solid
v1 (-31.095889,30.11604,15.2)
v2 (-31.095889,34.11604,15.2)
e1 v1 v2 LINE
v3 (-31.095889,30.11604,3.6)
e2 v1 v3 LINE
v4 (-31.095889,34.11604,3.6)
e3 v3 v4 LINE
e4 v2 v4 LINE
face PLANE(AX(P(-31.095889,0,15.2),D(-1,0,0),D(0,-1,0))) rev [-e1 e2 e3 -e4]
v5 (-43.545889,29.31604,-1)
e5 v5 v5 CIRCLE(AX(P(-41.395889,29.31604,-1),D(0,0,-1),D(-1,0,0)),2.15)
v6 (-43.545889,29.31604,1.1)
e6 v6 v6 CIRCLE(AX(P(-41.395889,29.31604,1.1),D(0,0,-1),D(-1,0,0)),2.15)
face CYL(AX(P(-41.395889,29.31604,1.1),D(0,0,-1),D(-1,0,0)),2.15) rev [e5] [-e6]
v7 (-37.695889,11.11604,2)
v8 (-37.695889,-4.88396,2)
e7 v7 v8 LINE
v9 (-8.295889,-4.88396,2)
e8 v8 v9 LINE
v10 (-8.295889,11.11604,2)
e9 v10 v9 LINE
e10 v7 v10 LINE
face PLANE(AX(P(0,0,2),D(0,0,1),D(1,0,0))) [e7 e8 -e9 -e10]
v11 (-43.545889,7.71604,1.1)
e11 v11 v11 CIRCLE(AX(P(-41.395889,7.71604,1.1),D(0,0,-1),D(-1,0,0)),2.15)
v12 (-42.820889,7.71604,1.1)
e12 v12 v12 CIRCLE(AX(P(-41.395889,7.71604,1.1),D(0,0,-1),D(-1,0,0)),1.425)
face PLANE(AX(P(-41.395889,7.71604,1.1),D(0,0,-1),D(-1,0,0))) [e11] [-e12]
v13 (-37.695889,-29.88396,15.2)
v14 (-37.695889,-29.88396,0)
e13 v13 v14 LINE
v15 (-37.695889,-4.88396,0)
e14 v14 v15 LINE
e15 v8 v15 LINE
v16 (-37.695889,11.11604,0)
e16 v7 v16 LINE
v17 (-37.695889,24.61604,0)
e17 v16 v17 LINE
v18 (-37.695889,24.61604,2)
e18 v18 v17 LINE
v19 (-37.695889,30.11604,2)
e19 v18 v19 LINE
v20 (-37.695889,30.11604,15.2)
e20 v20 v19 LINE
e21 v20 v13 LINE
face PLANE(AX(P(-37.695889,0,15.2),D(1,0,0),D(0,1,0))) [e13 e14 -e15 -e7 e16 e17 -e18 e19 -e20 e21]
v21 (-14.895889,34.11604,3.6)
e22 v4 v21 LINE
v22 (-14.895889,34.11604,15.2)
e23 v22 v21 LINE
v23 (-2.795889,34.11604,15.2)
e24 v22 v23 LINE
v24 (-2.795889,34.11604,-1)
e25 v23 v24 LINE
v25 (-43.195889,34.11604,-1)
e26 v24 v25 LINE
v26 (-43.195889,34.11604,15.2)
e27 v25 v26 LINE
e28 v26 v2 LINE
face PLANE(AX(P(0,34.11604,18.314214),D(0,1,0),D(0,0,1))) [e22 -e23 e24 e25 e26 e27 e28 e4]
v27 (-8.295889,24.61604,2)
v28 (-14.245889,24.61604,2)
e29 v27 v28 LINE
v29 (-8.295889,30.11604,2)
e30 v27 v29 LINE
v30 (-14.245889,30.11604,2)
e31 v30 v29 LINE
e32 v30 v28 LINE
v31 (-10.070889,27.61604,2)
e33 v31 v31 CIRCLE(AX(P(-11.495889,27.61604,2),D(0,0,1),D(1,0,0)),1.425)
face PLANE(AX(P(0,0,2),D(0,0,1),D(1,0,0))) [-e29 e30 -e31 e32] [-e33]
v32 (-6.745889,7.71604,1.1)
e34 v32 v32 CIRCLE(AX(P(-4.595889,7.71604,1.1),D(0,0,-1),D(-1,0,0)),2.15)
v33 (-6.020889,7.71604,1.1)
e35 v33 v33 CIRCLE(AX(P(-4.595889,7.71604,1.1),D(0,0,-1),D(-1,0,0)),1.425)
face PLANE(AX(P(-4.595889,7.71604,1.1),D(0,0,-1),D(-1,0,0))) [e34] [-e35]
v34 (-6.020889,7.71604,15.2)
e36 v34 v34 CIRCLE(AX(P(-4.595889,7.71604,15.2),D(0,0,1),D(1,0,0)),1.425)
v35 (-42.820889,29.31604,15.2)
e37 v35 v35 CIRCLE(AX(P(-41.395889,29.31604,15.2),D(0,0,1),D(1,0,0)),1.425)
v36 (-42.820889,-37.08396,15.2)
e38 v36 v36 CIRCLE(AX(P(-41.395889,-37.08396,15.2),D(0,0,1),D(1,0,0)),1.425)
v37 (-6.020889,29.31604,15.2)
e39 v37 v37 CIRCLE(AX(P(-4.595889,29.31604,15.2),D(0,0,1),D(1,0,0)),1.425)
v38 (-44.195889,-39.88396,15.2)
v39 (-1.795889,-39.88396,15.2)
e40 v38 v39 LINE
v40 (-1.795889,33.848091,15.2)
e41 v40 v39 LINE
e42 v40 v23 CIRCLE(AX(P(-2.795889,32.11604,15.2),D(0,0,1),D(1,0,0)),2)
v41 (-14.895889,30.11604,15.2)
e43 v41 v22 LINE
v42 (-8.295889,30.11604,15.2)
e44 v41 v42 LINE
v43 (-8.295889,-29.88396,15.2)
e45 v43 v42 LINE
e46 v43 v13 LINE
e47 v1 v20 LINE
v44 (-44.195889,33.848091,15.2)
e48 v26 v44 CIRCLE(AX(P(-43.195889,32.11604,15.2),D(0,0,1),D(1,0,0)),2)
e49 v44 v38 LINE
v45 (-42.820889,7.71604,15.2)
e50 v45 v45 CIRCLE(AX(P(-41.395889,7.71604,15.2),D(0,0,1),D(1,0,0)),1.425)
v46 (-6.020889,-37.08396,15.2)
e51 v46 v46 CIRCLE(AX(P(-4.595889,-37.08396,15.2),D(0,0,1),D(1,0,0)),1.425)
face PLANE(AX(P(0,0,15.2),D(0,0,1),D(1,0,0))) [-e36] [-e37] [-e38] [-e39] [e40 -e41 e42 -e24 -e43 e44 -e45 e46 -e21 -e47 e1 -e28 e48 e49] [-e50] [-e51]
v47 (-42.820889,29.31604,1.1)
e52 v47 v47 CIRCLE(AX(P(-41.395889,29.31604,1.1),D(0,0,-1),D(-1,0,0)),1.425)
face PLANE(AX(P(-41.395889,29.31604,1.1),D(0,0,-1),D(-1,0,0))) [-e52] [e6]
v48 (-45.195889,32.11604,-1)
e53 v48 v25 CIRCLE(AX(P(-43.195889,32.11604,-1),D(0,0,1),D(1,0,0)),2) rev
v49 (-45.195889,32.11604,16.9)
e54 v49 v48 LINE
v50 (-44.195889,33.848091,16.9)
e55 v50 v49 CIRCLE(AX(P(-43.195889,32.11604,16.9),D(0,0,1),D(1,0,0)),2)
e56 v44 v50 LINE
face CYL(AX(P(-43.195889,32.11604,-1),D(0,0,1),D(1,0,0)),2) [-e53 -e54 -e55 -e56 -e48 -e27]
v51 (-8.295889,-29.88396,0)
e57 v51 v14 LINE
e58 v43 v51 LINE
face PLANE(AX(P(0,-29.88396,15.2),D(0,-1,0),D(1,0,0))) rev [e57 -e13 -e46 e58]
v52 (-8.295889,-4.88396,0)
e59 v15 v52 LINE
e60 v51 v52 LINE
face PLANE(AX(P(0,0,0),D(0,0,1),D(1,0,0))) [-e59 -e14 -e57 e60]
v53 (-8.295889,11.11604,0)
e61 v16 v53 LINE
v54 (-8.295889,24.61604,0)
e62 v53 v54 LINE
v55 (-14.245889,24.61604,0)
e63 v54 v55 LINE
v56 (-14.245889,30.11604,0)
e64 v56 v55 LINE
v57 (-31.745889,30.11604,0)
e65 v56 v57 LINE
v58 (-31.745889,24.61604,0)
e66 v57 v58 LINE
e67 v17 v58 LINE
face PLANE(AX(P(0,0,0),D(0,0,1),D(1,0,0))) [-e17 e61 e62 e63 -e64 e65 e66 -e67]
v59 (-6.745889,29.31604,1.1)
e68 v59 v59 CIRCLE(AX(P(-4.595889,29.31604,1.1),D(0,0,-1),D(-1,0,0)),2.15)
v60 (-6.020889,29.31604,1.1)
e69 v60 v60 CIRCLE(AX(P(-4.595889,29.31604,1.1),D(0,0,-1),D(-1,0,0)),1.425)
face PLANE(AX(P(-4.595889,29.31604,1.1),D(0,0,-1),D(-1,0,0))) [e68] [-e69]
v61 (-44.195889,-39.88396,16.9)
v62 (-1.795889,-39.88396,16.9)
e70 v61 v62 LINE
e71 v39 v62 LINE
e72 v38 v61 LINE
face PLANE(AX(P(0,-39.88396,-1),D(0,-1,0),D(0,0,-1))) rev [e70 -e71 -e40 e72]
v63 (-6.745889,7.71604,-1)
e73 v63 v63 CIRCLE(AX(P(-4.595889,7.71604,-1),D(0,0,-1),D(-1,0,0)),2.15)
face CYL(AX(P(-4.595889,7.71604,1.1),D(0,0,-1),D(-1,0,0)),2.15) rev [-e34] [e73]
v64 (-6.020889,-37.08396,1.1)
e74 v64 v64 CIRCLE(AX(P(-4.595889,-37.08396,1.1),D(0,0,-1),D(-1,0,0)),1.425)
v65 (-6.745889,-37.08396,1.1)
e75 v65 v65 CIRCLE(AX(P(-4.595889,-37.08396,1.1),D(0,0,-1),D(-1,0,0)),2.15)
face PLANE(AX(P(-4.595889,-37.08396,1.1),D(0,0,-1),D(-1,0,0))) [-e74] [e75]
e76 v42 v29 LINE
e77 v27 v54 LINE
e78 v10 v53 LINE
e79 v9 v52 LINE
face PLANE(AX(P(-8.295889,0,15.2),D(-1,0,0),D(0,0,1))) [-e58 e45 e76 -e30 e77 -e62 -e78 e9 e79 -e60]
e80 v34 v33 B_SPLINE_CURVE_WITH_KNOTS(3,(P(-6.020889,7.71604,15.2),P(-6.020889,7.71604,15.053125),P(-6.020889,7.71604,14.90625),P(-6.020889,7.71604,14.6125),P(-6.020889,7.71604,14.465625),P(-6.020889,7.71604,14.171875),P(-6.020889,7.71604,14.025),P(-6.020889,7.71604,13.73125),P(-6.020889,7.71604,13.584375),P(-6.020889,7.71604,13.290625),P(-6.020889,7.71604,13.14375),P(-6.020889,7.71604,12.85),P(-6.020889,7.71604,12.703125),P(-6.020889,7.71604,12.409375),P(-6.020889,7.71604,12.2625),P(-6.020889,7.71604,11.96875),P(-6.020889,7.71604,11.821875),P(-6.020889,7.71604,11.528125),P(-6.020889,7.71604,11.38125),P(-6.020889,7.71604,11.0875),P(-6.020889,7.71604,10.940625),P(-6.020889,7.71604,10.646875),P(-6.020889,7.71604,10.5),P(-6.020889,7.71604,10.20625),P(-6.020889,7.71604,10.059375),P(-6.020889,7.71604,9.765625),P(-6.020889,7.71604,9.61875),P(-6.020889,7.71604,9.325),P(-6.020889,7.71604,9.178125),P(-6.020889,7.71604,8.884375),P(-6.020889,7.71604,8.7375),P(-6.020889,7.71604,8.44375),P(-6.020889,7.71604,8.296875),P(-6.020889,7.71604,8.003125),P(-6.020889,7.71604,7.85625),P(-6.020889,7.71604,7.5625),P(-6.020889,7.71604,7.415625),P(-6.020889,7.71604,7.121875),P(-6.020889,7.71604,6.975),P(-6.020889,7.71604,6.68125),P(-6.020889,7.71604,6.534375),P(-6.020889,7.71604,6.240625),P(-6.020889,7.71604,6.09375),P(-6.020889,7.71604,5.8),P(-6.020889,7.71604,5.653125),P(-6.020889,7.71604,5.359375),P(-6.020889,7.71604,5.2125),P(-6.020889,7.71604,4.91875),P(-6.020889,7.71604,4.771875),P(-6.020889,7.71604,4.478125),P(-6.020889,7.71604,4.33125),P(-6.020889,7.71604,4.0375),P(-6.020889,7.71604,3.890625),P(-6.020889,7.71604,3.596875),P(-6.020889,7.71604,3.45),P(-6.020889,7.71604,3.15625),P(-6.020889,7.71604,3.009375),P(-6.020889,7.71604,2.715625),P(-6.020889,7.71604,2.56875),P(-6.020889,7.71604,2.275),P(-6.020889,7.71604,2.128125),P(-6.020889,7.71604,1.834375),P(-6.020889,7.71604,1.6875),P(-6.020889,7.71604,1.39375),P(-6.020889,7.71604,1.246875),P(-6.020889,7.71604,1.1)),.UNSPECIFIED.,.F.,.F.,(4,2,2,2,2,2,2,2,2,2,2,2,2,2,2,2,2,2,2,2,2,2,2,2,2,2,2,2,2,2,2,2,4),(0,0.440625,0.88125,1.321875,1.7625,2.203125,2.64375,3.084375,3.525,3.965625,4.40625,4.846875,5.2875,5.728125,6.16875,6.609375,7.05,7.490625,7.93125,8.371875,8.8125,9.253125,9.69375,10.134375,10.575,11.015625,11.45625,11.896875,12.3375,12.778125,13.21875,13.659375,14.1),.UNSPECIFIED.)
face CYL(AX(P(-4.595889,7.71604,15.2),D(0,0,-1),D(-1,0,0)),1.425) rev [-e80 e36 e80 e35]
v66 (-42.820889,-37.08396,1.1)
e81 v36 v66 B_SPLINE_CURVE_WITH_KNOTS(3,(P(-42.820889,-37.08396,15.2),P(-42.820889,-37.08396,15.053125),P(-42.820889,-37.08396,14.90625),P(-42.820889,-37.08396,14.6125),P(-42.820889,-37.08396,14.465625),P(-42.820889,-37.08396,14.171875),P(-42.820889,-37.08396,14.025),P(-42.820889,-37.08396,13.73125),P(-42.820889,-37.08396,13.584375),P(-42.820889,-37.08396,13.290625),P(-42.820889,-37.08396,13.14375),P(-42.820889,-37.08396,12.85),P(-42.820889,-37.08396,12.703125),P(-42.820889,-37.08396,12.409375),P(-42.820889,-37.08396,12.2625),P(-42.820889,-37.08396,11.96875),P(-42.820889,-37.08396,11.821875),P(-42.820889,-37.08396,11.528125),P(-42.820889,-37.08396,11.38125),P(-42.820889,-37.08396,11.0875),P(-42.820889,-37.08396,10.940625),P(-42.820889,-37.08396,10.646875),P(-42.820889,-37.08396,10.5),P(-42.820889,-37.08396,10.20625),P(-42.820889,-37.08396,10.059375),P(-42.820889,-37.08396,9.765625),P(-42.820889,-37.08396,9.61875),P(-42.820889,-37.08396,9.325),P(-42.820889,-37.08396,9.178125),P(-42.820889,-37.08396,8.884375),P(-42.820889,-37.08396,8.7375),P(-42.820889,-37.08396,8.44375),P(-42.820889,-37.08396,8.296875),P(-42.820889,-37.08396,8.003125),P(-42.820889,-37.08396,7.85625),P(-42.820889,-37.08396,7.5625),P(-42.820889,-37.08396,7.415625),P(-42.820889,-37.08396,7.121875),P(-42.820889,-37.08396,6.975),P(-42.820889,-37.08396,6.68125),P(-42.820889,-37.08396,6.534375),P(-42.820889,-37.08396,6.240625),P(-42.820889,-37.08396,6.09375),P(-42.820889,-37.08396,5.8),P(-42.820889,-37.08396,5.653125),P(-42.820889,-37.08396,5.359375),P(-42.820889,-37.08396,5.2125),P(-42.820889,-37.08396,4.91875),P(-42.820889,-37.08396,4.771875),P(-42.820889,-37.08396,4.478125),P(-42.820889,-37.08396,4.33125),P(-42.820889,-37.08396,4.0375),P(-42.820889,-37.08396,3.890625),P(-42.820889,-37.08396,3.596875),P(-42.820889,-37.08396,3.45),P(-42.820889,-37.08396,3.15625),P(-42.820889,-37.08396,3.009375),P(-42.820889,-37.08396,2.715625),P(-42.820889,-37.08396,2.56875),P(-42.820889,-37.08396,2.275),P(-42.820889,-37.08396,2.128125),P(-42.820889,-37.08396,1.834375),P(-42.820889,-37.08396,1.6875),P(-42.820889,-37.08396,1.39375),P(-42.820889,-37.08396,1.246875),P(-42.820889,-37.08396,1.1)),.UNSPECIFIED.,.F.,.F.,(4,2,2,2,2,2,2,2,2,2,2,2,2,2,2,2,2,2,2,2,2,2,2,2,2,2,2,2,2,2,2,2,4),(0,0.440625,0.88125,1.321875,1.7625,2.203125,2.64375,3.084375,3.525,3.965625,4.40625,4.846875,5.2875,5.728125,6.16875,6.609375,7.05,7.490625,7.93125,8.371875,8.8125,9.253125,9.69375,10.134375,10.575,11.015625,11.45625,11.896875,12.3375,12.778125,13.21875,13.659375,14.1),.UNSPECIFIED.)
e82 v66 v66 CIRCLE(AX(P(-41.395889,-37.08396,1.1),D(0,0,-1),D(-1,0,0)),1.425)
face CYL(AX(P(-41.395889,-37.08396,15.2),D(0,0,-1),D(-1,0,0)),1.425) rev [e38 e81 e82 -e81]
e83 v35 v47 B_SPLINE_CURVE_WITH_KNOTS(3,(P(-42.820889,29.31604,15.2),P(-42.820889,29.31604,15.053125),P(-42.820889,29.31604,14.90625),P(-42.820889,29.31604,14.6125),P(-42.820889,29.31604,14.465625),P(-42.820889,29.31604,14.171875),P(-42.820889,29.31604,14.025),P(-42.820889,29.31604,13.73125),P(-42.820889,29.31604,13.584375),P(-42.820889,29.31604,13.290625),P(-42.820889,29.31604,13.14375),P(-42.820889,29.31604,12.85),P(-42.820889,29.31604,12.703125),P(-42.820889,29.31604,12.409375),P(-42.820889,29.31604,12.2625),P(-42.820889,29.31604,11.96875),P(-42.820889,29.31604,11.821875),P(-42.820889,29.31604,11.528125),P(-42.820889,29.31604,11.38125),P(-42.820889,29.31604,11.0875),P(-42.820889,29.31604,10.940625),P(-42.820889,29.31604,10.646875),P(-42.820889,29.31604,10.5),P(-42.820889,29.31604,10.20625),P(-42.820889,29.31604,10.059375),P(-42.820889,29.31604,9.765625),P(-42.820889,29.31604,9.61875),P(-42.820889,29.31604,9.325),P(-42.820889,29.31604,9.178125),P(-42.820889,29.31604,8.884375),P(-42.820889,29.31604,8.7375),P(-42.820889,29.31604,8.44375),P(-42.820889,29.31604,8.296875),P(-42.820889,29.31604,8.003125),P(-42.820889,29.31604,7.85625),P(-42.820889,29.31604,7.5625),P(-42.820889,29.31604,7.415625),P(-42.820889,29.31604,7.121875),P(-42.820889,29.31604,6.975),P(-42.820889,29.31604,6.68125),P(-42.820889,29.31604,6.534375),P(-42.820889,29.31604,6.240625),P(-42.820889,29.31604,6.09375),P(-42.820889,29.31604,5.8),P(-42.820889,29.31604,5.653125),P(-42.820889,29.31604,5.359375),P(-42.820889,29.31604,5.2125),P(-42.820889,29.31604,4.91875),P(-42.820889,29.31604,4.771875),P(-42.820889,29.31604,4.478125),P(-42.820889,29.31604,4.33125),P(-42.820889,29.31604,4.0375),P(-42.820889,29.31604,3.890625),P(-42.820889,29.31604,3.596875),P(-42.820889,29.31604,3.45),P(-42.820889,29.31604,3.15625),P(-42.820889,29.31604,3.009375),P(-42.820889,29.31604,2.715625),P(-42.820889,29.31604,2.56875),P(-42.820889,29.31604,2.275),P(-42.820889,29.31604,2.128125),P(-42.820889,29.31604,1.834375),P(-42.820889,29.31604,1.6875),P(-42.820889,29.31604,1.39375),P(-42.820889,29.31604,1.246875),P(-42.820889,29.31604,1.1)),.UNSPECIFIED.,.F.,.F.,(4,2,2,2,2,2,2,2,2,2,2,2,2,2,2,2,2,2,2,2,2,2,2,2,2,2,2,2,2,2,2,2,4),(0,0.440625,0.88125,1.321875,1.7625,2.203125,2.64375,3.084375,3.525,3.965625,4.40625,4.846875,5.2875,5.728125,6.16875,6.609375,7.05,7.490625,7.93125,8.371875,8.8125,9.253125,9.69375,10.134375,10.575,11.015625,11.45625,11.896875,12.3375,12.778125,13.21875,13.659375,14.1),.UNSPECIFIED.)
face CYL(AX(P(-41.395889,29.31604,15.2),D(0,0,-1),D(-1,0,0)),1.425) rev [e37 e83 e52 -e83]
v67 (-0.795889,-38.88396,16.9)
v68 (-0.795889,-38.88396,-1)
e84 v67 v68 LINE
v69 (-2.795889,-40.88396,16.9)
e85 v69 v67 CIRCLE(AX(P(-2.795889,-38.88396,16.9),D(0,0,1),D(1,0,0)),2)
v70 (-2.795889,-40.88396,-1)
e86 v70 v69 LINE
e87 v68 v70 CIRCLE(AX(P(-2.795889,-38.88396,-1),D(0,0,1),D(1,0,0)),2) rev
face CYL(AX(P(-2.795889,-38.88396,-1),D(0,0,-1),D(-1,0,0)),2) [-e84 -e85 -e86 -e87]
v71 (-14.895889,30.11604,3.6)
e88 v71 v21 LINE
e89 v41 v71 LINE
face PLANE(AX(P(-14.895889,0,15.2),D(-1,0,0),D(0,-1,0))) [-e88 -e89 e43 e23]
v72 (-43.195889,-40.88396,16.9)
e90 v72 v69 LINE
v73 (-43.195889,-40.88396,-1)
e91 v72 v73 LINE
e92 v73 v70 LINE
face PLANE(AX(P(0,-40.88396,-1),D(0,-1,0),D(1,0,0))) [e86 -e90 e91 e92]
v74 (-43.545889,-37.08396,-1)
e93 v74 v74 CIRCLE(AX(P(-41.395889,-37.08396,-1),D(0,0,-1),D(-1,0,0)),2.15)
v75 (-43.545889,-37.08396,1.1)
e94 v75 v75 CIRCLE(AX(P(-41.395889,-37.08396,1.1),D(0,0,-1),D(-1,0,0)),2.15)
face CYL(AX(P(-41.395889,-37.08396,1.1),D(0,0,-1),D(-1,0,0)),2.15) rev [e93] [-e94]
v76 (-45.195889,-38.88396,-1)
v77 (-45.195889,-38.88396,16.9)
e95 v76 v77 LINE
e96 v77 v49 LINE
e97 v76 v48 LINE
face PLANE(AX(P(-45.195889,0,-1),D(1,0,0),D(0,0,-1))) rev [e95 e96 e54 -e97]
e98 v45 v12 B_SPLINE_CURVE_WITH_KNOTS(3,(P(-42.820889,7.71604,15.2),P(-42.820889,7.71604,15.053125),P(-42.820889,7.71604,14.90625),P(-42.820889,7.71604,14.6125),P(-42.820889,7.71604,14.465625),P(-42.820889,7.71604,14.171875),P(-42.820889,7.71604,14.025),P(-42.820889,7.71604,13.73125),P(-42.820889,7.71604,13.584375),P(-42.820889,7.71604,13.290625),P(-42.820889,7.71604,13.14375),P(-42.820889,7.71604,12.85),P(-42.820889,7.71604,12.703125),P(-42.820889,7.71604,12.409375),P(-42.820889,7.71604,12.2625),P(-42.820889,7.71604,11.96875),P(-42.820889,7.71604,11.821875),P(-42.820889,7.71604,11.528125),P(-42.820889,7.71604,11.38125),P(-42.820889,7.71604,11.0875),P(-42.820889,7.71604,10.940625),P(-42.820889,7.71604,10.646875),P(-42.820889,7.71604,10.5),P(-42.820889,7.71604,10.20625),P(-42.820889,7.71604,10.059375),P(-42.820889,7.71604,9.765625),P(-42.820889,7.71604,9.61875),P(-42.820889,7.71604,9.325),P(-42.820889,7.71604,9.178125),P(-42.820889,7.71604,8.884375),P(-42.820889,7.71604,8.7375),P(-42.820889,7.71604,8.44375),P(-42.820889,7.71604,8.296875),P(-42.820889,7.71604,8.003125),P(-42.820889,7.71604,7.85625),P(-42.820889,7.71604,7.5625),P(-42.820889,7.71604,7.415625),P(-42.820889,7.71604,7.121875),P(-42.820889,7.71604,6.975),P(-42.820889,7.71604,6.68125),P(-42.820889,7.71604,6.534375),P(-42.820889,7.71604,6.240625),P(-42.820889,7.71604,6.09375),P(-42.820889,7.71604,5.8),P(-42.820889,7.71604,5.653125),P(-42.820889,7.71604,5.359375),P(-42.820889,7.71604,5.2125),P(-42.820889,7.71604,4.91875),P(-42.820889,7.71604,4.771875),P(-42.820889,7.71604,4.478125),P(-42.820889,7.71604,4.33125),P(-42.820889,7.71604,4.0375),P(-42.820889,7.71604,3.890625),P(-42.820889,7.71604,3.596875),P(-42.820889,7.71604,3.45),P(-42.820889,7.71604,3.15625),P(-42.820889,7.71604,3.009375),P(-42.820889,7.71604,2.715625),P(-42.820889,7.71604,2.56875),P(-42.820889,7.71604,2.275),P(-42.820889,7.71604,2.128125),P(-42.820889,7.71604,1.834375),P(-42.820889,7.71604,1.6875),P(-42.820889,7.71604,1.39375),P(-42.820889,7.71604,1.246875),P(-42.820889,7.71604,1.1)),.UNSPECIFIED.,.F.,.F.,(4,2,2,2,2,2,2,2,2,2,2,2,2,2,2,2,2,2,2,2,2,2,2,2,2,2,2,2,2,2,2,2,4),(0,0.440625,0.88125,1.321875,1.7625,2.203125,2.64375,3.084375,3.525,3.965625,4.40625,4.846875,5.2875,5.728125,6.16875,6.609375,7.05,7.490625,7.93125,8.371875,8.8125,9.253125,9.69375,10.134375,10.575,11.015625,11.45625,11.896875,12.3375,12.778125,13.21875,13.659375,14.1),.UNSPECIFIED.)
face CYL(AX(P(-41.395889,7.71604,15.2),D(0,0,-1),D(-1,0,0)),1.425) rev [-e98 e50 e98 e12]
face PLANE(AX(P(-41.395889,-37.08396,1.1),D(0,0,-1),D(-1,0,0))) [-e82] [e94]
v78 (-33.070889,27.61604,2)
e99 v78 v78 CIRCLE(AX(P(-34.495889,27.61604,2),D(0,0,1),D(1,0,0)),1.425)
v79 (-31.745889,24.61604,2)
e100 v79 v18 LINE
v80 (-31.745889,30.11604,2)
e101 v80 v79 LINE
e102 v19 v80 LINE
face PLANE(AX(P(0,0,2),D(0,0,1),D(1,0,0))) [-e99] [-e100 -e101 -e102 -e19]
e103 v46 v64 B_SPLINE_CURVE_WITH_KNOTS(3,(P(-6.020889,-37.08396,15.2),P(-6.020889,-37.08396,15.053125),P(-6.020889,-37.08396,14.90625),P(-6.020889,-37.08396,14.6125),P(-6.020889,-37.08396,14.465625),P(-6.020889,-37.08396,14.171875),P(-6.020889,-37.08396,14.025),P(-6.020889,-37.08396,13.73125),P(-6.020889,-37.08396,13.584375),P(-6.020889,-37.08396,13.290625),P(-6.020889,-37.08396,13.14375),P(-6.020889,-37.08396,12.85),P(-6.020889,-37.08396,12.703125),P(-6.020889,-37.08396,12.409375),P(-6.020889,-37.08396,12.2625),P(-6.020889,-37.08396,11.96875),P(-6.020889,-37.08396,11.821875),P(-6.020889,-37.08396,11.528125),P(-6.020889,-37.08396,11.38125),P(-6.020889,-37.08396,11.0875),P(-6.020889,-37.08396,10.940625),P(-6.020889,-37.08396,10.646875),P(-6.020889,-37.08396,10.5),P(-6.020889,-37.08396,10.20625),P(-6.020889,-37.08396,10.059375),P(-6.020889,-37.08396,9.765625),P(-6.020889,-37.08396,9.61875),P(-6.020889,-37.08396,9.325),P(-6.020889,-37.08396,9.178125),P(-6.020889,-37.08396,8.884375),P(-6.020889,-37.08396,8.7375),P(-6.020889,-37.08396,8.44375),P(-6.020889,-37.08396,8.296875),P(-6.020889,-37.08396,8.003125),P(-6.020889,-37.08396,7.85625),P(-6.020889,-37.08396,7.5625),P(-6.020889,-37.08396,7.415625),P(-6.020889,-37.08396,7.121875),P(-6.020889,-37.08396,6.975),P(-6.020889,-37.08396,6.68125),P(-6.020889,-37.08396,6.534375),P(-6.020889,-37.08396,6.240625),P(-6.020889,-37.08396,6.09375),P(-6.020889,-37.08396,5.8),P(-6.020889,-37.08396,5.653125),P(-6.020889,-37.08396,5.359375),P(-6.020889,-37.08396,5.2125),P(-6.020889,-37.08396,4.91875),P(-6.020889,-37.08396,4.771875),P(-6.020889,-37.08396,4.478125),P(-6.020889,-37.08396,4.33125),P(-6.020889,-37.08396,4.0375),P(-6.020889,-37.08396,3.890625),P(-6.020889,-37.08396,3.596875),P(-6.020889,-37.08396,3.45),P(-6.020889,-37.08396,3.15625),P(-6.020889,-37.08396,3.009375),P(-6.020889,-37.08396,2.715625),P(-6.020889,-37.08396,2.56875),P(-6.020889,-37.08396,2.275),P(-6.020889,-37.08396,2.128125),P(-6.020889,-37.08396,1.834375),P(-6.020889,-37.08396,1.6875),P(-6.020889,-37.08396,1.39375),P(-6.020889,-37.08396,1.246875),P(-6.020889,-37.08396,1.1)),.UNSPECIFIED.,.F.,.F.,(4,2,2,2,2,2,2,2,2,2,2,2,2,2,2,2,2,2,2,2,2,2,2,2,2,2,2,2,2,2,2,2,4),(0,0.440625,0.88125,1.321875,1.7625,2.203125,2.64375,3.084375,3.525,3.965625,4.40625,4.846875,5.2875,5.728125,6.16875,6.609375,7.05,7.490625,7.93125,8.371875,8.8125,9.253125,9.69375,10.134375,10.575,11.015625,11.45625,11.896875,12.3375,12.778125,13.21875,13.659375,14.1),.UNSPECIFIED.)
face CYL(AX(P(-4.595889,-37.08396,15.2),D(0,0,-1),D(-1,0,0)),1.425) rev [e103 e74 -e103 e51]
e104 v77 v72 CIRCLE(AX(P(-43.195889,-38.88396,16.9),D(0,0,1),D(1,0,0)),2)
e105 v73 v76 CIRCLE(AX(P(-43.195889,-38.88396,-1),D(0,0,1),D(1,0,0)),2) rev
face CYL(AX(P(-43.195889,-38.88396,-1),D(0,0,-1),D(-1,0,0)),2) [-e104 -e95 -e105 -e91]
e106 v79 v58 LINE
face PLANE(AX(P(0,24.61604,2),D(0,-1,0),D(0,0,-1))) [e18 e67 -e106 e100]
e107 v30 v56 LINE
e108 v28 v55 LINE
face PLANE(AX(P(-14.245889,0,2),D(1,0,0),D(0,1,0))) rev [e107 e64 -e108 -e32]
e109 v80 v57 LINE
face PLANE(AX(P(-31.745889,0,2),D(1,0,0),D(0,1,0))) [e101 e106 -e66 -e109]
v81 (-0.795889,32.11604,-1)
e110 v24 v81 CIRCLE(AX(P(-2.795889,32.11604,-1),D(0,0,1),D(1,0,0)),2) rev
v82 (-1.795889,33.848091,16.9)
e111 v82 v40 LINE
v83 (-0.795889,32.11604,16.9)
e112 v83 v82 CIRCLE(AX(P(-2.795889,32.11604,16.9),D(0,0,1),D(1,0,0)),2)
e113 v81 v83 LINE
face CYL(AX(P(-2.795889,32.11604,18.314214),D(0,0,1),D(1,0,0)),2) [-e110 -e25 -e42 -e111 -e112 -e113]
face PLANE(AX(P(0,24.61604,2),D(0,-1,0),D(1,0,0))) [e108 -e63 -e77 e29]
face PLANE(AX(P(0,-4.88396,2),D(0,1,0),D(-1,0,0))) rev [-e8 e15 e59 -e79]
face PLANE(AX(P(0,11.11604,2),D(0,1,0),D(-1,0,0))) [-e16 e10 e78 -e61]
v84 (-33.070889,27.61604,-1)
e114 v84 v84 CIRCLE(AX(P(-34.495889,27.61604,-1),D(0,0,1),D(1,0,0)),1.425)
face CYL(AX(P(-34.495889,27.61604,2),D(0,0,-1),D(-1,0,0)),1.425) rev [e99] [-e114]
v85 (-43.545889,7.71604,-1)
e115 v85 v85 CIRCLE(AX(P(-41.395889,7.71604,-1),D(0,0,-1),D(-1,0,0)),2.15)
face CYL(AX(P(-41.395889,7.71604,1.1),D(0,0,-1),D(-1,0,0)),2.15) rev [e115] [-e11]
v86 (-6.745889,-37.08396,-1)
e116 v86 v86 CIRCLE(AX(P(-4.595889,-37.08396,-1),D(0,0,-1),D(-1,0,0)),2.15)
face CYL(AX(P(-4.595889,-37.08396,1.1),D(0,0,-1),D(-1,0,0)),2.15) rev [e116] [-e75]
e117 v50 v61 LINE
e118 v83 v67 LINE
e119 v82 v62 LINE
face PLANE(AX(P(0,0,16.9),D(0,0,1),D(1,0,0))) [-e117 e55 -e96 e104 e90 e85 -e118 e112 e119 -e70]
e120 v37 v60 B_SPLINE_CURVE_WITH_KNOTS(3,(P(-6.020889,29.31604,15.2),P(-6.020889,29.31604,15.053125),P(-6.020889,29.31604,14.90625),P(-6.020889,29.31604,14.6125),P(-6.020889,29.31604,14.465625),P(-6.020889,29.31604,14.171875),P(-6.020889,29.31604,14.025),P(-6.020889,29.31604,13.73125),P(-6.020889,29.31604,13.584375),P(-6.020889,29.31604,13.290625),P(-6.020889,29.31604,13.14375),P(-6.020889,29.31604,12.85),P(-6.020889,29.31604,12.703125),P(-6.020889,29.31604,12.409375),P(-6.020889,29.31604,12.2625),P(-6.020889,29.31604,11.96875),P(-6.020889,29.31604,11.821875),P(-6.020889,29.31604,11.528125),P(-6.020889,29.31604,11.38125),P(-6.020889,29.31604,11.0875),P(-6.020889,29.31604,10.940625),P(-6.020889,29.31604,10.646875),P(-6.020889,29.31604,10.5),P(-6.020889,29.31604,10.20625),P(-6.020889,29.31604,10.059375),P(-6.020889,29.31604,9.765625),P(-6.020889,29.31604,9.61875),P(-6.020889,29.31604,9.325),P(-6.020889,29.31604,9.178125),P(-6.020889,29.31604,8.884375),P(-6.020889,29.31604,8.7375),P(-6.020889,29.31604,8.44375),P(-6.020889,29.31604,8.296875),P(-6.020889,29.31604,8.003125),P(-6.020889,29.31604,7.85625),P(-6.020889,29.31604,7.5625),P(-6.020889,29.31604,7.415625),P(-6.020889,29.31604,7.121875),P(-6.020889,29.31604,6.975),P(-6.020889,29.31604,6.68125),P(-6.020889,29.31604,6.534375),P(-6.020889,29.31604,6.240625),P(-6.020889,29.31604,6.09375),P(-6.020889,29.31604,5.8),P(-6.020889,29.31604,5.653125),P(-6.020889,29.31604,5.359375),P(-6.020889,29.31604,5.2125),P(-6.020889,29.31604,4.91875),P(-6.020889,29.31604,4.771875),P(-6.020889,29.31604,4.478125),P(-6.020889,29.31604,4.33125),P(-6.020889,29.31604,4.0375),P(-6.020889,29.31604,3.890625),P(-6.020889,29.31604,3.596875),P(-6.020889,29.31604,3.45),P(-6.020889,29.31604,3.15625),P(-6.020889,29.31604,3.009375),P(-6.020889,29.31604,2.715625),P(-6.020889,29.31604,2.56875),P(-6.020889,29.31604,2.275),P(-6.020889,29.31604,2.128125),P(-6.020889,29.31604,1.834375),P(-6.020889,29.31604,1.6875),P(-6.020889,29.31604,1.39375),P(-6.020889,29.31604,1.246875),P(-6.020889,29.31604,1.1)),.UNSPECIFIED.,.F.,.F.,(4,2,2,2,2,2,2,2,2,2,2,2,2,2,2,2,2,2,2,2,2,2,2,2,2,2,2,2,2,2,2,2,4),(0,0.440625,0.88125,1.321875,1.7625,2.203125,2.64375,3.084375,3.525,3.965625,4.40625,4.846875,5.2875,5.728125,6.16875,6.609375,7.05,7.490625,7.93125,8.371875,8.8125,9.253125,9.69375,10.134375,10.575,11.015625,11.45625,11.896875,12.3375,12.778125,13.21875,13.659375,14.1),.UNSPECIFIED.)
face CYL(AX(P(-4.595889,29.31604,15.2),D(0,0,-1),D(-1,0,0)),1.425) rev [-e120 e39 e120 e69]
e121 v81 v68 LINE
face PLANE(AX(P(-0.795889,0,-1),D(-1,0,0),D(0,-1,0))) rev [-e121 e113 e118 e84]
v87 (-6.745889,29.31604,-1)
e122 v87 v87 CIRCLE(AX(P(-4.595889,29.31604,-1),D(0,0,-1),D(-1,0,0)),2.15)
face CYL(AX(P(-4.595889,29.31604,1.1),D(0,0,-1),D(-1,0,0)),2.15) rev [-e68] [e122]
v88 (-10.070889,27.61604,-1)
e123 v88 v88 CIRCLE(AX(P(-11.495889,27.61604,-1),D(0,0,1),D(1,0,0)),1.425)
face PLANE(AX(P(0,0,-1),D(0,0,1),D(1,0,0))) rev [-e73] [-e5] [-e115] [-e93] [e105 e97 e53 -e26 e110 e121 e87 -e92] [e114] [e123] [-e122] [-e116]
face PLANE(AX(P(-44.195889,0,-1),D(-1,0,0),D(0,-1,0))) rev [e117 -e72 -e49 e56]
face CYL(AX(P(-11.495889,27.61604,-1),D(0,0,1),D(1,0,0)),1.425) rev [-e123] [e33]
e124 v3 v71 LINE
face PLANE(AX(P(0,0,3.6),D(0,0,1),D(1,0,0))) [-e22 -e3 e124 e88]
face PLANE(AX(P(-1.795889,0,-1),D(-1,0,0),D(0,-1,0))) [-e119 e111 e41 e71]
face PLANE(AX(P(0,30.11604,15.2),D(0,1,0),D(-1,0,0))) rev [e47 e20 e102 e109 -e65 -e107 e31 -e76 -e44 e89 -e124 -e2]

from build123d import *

# Parameters (mm, degrees)
SKETCH_2_R            = 1.425
EXTRUDE_1_DEPTH       = 2
SKETCH_2_3_R          = 1.425
EXTRUDE_2_DEPTH       = 2
EXTRUDE_START         = -1
EXTRUDE_3_DEPTH       = 1
EXTRUDE_4_DEPTH       = 1
SKETCH_2_6_W          = 8.1
SKETCH_2_6_H          = 3
EXTRUDE_5_DEPTH       = 3.6
EXTRUDE_6_DEPTH       = 15.2
EXTRUDE_6_DEPTH_BACK  = 1
SKETCH_2_7_R          = 1.425
SKETCH_2_8_W          = 29.4
SKETCH_2_8_H          = 25
EXTRUDE_7_DEPTH       = 1
SKETCH_2_9_W          = 29.4
SKETCH_2_9_H          = 16
EXTRUDE_8_DEPTH       = 1
SKETCH_2_10_W         = 29.4
SKETCH_2_10_H         = 16
EXTRUDE_9_DEPTH       = 2
SKETCH_2_11_W         = 8.1
SKETCH_2_11_H         = 3
SKETCH_2_11_R         = 1.425
EXTRUDE_10_DEPTH      = 1
EXTRUDE_12_DEPTH      = 16.9
EXTRUDE_12_DEPTH_BACK = 1
SKETCH_2_24_W         = 1
SKETCH_2_24_H         = 1
EXTRUDE_13_DEPTH      = 16.9
SKETCH_2_25_W         = 13.1
SKETCH_2_25_H         = 1
EXTRUDE_14_DEPTH      = 15.2
SKETCH_2_26_W         = 8.1
SKETCH_2_26_H         = 1
EXTRUDE_15_DEPTH      = 3.6
SKETCH_2_28_W         = 1
SKETCH_2_28_H         = 1
SKETCH_2_28_W_2       = 13.1
SKETCH_2_28_W_3       = 8.1
EXTRUDE_16_DEPTH      = 1
FILLET_1_R            = 2
SKETCH_4_R            = 2.15
SKETCH_4_R_2          = 1.425
CUT_EXTRUDE_1_DEPTH   = 2.1


# Read off the part's stored shape, not the designer's step: 凸台-拉伸3
with BuildPart() as part:
    # 草图2 → 凸台-拉伸1 (new body)
    with BuildSketch(Plane.XY):
        Polygon((-31.74588875, 30.116039863), (-37.24588875, 30.116039863), (-37.69588875, 30.116039863), (-37.69588875, 24.616039863), (-37.24588875, 24.616039863), (-31.74588875, 24.616039863), align=None)
        with Locations((-34.49588875, 27.616039863)):
            Circle(SKETCH_2_R, mode=Mode.SUBTRACT)
    extrude(amount=EXTRUDE_1_DEPTH)



with BuildPart() as body_2:
    # 草图2<3> → 凸台-拉伸2 (new body)
    with BuildSketch(Plane.XY):
        Polygon((-8.74588875, 30.116039863), (-14.24588875, 30.116039863), (-14.24588875, 24.616039863), (-8.74588875, 24.616039863), (-8.29588875, 24.616039863), (-8.29588875, 30.116039863), align=None)
        with Locations((-11.49588875, 27.616039863)):
            Circle(SKETCH_2_3_R, mode=Mode.SUBTRACT)
    extrude(amount=EXTRUDE_2_DEPTH)


with BuildPart() as body_3:
    # 凸台-拉伸3 outline → 凸台-拉伸3 (new body)
    with BuildSketch(Plane.XY.offset(EXTRUDE_START)):
        Polygon((-37.69588875, 24.616039863), (-37.69588875, 11.116039863), (-22.99588875, 11.116039863), (-22.99588875, 30.116039863), (-31.74588875, 30.116039863), (-31.74588875, 24.616039863), align=None)
    extrude(amount=EXTRUDE_3_DEPTH)

    # 草图2<5> → 凸台-拉伸4 (add)
    with BuildSketch(Plane.XY):
        Polygon((-22.99588875, 30.116039863), (-22.99588875, 28.589280798), (-22.99588875, 11.116039863), (-8.29588875, 11.116039863), (-8.29588875, 24.616039863), (-8.74588875, 24.616039863), (-14.24588875, 24.616039863), (-14.24588875, 30.116039863), (-14.89588875, 30.116039863), align=None)
    extrude(amount=-EXTRUDE_4_DEPTH)

    # 草图2<7> → 凸台-拉伸6 (add, two sides: drawn at the far end of the back side and taken through both)
    with BuildSketch(Plane.XY.offset(-EXTRUDE_6_DEPTH_BACK)):
        Polygon((-31.74588875, 30.116039863), (-31.09588875, 30.116039863), (-31.09588875, 33.116039863), (-44.19588875, 33.116039863), (-44.19588875, 11.116039863), (-44.19588875, -29.883960137), (-44.19588875, -39.883960137), (-1.79588875, -39.883960137), (-1.79588875, -29.883960137), (-1.79588875, 11.116039863), (-1.79588875, 33.116039863), (-14.89588875, 33.116039863), (-14.89588875, 30.116039863), (-14.24588875, 30.116039863), (-8.74588875, 30.116039863), (-8.29588875, 30.116039863), (-8.29588875, 24.616039863), (-8.29588875, 11.116039863), (-8.29588875, -4.883960137), (-8.29588875, -29.883960137), (-37.69588875, -29.883960137), (-37.69588875, -4.883960137), (-37.69588875, 11.116039863), (-37.69588875, 24.616039863), (-37.69588875, 30.116039863), (-37.24588875, 30.116039863), align=None)
        with Locations(Location((-41.39588875, -37.083960137, 0), (0, 0, 180))):
            Circle(SKETCH_2_7_R, mode=Mode.SUBTRACT)
        with Locations(Location((-4.59588875, -37.083960137, 0), (0, 0, 180))):
            Circle(SKETCH_2_7_R, mode=Mode.SUBTRACT)
        with Locations(Location((-41.39588875, 7.716039863, 0), (0, 0, 180))):
            Circle(SKETCH_2_7_R, mode=Mode.SUBTRACT)
        with Locations(Location((-41.39588875, 29.316039863, 0), (0, 0, 180))):
            Circle(SKETCH_2_7_R, mode=Mode.SUBTRACT)
        with Locations(Location((-4.59588875, 7.716039863, 0), (0, 0, 180))):
            Circle(SKETCH_2_7_R, mode=Mode.SUBTRACT)
        with Locations(Location((-4.59588875, 29.316039863, 0), (0, 0, 180))):
            Circle(SKETCH_2_7_R, mode=Mode.SUBTRACT)
    extrude(amount=EXTRUDE_6_DEPTH + EXTRUDE_6_DEPTH_BACK)

    # 草图2<8> → 凸台-拉伸7 (add)
    with BuildSketch(Plane.XY):
        with Locations((-22.99588875, -17.383960137)):
            Rectangle(SKETCH_2_8_W, SKETCH_2_8_H)
    extrude(amount=-EXTRUDE_7_DEPTH)

    # 草图2<9> → 凸台-拉伸8 (add)
    with BuildSketch(Plane.XY):
        with Locations((-22.99588875, 3.116039863)):
            Rectangle(SKETCH_2_9_W, SKETCH_2_9_H)
    extrude(amount=-EXTRUDE_8_DEPTH)

    # 草图2<10> → 凸台-拉伸9 (add)
    with BuildSketch(Plane.XY):
        with Locations((-22.99588875, 3.116039863)):
            Rectangle(SKETCH_2_10_W, SKETCH_2_10_H)
    extrude(amount=EXTRUDE_9_DEPTH)


with BuildPart() as body_4:
    # 草图2<6> → 凸台-拉伸5 (new body)
    with BuildSketch(Plane.XY):
        with Locations((-27.04588875, 31.616039863)):
            Rectangle(SKETCH_2_6_W, SKETCH_2_6_H)
        with Locations((-18.94588875, 31.616039863)):
            Rectangle(SKETCH_2_6_W, SKETCH_2_6_H)
    extrude(amount=EXTRUDE_5_DEPTH)


with BuildPart() as part_1:
    add(part.part)

    add(body_2.part)  # 凸台-拉伸10 merges body 2

    add(body_3.part)  # 凸台-拉伸10 merges body 3

    add(body_4.part)  # 凸台-拉伸10 merges body 4
    # 草图2<11> → 凸台-拉伸10 (add)
    # profile 1 of 4: a face of its own
    with BuildSketch(Plane.XY.offset(EXTRUDE_START)):
        with Locations((-18.94588875, 31.616039863)):
            Rectangle(SKETCH_2_11_W, SKETCH_2_11_H)
    # profile 2 of 4: a face of its own
    with BuildSketch(Plane.XY.offset(EXTRUDE_START)):
        with Locations((-27.04588875, 31.616039863)):
            Rectangle(SKETCH_2_11_W, SKETCH_2_11_H)
    # profile 3 of 4: a face of its own
    with BuildSketch(Plane.XY.offset(EXTRUDE_START)):
        Polygon((-8.74588875, 30.116039863), (-14.24588875, 30.116039863), (-14.24588875, 24.616039863), (-8.74588875, 24.616039863), (-8.29588875, 24.616039863), (-8.29588875, 30.116039863), align=None)
        with Locations((-11.49588875, 27.616039863)):
            Circle(SKETCH_2_11_R, mode=Mode.SUBTRACT)
    # profile 4 of 4: a face of its own
    with BuildSketch(Plane.XY.offset(EXTRUDE_START)):
        Polygon((-31.74588875, 24.616039863), (-31.74588875, 30.116039863), (-37.24588875, 30.116039863), (-37.69588875, 30.116039863), (-37.69588875, 24.616039863), (-37.24588875, 24.616039863), align=None)
        with Locations((-34.49588875, 27.616039863)):
            Circle(SKETCH_2_11_R, mode=Mode.SUBTRACT)
    extrude(amount=EXTRUDE_10_DEPTH)

    # 草图2<22> → 凸台-拉伸12 (add, two sides: drawn at the far end of the back side and taken through both)
    with BuildSketch(Plane.XY.offset(-EXTRUDE_12_DEPTH_BACK)):
        Polygon((-44.19588875, 11.116039863), (-44.19588875, 33.116039863), (-45.19588875, 33.116039863), (-45.19588875, -40.883960137), (-44.19588875, -40.883960137), (-0.79588875, -40.883960137), (-0.79588875, 33.116039863), (-1.79588875, 33.116039863), (-1.79588875, 11.116039863), (-1.79588875, -29.883960137), (-1.79588875, -39.883960137), (-44.19588875, -39.883960137), (-44.19588875, -29.883960137), align=None)
    extrude(amount=EXTRUDE_12_DEPTH + EXTRUDE_12_DEPTH_BACK)

    # 草图2<24> → 凸台-拉伸13 (add)
    with BuildSketch(Plane.XY):
        with Locations((-44.69588875, 33.616039863)):
            Rectangle(SKETCH_2_24_W, SKETCH_2_24_H)
        with Locations((-1.29588875, 33.616039863)):
            Rectangle(SKETCH_2_24_W, SKETCH_2_24_H)
    extrude(amount=EXTRUDE_13_DEPTH)

    # 草图2<25> → 凸台-拉伸14 (add)
    with BuildSketch(Plane.XY):
        with Locations((-37.64588875, 33.616039863)):
            Rectangle(SKETCH_2_25_W, SKETCH_2_25_H)
        with Locations((-8.34588875, 33.616039863)):
            Rectangle(SKETCH_2_25_W, SKETCH_2_25_H)
    extrude(amount=EXTRUDE_14_DEPTH)

    # 草图2<26> → 凸台-拉伸15 (add)
    with BuildSketch(Plane.XY):
        with Locations((-27.04588875, 33.616039863)):
            Rectangle(SKETCH_2_26_W, SKETCH_2_26_H)
        with Locations((-18.94588875, 33.616039863)):
            Rectangle(SKETCH_2_26_W, SKETCH_2_26_H)
    extrude(amount=EXTRUDE_15_DEPTH)

    # 草图2<28> → 凸台-拉伸16 (add)
    with BuildSketch(Plane.XY):
        with Locations((-1.29588875, 33.616039863)):
            Rectangle(SKETCH_2_28_W, SKETCH_2_28_H)
        with Locations((-8.34588875, 33.616039863)):
            Rectangle(SKETCH_2_28_W_2, SKETCH_2_28_H)
        with Locations((-18.94588875, 33.616039863)):
            Rectangle(SKETCH_2_28_W_3, SKETCH_2_28_H)
        with Locations((-27.04588875, 33.616039863)):
            Rectangle(SKETCH_2_28_W_3, SKETCH_2_28_H)
        with Locations((-37.64588875, 33.616039863)):
            Rectangle(SKETCH_2_28_W_2, SKETCH_2_28_H)
        with Locations((-44.69588875, 33.616039863)):
            Rectangle(SKETCH_2_28_W, SKETCH_2_28_H)
    extrude(amount=-EXTRUDE_16_DEPTH)

    # 圆角1
    fillet_1_edges = [part_1.edges().sort_by_distance(p)[0] for p in [
        (-0.79588875, -40.883960137, 7.95),
        (-45.19588875, -40.883960137, 7.95),
        (-0.79588875, 34.116039863, 7.95),
        (-45.19588875, 34.116039863, 7.95),
    ]]
    fillet(fillet_1_edges, radius=FILLET_1_R)

    # 草图4 → 切除-拉伸1 (cut)
    # profile 1 of 6: a face of its own
    with BuildSketch(Plane(origin=(0, 0, -1), x_dir=(-1, 0, 0), z_dir=(0, 0, -1))):
        with Locations((4.59588875, 7.716039863)):
            Circle(SKETCH_4_R)
        with Locations((4.59588875, 7.716039863)):
            Circle(SKETCH_4_R_2, mode=Mode.SUBTRACT)
    # profile 2 of 6: a face of its own
    with BuildSketch(Plane(origin=(0, 0, -1), x_dir=(-1, 0, 0), z_dir=(0, 0, -1))):
        with Locations((4.59588875, 29.316039863)):
            Circle(SKETCH_4_R)
        with Locations((4.59588875, 29.316039863)):
            Circle(SKETCH_4_R_2, mode=Mode.SUBTRACT)
    # profile 3 of 6: a face of its own
    with BuildSketch(Plane(origin=(0, 0, -1), x_dir=(-1, 0, 0), z_dir=(0, 0, -1))):
        with Locations((41.39588875, 29.316039863)):
            Circle(SKETCH_4_R)
        with Locations((41.39588875, 29.316039863)):
            Circle(SKETCH_4_R_2, mode=Mode.SUBTRACT)
    # profile 4 of 6: a face of its own
    with BuildSketch(Plane(origin=(0, 0, -1), x_dir=(-1, 0, 0), z_dir=(0, 0, -1))):
        with Locations((41.39588875, 7.716039863)):
            Circle(SKETCH_4_R)
        with Locations((41.39588875, 7.716039863)):
            Circle(SKETCH_4_R_2, mode=Mode.SUBTRACT)
    # profile 5 of 6: a face of its own
    with BuildSketch(Plane(origin=(0, 0, -1), x_dir=(-1, 0, 0), z_dir=(0, 0, -1))):
        with Locations((4.59588875, -37.083960137)):
            Circle(SKETCH_4_R)
        with Locations((4.59588875, -37.083960137)):
            Circle(SKETCH_4_R_2, mode=Mode.SUBTRACT)
    # profile 6 of 6: a face of its own
    with BuildSketch(Plane(origin=(0, 0, -1), x_dir=(-1, 0, 0), z_dir=(0, 0, -1))):
        with Locations((41.39588875, -37.083960137)):
            Circle(SKETCH_4_R)
        with Locations((41.39588875, -37.083960137)):
            Circle(SKETCH_4_R_2, mode=Mode.SUBTRACT)
    extrude(amount=-CUT_EXTRUDE_1_DEPTH, mode=Mode.SUBTRACT)


solid = part_1.part
